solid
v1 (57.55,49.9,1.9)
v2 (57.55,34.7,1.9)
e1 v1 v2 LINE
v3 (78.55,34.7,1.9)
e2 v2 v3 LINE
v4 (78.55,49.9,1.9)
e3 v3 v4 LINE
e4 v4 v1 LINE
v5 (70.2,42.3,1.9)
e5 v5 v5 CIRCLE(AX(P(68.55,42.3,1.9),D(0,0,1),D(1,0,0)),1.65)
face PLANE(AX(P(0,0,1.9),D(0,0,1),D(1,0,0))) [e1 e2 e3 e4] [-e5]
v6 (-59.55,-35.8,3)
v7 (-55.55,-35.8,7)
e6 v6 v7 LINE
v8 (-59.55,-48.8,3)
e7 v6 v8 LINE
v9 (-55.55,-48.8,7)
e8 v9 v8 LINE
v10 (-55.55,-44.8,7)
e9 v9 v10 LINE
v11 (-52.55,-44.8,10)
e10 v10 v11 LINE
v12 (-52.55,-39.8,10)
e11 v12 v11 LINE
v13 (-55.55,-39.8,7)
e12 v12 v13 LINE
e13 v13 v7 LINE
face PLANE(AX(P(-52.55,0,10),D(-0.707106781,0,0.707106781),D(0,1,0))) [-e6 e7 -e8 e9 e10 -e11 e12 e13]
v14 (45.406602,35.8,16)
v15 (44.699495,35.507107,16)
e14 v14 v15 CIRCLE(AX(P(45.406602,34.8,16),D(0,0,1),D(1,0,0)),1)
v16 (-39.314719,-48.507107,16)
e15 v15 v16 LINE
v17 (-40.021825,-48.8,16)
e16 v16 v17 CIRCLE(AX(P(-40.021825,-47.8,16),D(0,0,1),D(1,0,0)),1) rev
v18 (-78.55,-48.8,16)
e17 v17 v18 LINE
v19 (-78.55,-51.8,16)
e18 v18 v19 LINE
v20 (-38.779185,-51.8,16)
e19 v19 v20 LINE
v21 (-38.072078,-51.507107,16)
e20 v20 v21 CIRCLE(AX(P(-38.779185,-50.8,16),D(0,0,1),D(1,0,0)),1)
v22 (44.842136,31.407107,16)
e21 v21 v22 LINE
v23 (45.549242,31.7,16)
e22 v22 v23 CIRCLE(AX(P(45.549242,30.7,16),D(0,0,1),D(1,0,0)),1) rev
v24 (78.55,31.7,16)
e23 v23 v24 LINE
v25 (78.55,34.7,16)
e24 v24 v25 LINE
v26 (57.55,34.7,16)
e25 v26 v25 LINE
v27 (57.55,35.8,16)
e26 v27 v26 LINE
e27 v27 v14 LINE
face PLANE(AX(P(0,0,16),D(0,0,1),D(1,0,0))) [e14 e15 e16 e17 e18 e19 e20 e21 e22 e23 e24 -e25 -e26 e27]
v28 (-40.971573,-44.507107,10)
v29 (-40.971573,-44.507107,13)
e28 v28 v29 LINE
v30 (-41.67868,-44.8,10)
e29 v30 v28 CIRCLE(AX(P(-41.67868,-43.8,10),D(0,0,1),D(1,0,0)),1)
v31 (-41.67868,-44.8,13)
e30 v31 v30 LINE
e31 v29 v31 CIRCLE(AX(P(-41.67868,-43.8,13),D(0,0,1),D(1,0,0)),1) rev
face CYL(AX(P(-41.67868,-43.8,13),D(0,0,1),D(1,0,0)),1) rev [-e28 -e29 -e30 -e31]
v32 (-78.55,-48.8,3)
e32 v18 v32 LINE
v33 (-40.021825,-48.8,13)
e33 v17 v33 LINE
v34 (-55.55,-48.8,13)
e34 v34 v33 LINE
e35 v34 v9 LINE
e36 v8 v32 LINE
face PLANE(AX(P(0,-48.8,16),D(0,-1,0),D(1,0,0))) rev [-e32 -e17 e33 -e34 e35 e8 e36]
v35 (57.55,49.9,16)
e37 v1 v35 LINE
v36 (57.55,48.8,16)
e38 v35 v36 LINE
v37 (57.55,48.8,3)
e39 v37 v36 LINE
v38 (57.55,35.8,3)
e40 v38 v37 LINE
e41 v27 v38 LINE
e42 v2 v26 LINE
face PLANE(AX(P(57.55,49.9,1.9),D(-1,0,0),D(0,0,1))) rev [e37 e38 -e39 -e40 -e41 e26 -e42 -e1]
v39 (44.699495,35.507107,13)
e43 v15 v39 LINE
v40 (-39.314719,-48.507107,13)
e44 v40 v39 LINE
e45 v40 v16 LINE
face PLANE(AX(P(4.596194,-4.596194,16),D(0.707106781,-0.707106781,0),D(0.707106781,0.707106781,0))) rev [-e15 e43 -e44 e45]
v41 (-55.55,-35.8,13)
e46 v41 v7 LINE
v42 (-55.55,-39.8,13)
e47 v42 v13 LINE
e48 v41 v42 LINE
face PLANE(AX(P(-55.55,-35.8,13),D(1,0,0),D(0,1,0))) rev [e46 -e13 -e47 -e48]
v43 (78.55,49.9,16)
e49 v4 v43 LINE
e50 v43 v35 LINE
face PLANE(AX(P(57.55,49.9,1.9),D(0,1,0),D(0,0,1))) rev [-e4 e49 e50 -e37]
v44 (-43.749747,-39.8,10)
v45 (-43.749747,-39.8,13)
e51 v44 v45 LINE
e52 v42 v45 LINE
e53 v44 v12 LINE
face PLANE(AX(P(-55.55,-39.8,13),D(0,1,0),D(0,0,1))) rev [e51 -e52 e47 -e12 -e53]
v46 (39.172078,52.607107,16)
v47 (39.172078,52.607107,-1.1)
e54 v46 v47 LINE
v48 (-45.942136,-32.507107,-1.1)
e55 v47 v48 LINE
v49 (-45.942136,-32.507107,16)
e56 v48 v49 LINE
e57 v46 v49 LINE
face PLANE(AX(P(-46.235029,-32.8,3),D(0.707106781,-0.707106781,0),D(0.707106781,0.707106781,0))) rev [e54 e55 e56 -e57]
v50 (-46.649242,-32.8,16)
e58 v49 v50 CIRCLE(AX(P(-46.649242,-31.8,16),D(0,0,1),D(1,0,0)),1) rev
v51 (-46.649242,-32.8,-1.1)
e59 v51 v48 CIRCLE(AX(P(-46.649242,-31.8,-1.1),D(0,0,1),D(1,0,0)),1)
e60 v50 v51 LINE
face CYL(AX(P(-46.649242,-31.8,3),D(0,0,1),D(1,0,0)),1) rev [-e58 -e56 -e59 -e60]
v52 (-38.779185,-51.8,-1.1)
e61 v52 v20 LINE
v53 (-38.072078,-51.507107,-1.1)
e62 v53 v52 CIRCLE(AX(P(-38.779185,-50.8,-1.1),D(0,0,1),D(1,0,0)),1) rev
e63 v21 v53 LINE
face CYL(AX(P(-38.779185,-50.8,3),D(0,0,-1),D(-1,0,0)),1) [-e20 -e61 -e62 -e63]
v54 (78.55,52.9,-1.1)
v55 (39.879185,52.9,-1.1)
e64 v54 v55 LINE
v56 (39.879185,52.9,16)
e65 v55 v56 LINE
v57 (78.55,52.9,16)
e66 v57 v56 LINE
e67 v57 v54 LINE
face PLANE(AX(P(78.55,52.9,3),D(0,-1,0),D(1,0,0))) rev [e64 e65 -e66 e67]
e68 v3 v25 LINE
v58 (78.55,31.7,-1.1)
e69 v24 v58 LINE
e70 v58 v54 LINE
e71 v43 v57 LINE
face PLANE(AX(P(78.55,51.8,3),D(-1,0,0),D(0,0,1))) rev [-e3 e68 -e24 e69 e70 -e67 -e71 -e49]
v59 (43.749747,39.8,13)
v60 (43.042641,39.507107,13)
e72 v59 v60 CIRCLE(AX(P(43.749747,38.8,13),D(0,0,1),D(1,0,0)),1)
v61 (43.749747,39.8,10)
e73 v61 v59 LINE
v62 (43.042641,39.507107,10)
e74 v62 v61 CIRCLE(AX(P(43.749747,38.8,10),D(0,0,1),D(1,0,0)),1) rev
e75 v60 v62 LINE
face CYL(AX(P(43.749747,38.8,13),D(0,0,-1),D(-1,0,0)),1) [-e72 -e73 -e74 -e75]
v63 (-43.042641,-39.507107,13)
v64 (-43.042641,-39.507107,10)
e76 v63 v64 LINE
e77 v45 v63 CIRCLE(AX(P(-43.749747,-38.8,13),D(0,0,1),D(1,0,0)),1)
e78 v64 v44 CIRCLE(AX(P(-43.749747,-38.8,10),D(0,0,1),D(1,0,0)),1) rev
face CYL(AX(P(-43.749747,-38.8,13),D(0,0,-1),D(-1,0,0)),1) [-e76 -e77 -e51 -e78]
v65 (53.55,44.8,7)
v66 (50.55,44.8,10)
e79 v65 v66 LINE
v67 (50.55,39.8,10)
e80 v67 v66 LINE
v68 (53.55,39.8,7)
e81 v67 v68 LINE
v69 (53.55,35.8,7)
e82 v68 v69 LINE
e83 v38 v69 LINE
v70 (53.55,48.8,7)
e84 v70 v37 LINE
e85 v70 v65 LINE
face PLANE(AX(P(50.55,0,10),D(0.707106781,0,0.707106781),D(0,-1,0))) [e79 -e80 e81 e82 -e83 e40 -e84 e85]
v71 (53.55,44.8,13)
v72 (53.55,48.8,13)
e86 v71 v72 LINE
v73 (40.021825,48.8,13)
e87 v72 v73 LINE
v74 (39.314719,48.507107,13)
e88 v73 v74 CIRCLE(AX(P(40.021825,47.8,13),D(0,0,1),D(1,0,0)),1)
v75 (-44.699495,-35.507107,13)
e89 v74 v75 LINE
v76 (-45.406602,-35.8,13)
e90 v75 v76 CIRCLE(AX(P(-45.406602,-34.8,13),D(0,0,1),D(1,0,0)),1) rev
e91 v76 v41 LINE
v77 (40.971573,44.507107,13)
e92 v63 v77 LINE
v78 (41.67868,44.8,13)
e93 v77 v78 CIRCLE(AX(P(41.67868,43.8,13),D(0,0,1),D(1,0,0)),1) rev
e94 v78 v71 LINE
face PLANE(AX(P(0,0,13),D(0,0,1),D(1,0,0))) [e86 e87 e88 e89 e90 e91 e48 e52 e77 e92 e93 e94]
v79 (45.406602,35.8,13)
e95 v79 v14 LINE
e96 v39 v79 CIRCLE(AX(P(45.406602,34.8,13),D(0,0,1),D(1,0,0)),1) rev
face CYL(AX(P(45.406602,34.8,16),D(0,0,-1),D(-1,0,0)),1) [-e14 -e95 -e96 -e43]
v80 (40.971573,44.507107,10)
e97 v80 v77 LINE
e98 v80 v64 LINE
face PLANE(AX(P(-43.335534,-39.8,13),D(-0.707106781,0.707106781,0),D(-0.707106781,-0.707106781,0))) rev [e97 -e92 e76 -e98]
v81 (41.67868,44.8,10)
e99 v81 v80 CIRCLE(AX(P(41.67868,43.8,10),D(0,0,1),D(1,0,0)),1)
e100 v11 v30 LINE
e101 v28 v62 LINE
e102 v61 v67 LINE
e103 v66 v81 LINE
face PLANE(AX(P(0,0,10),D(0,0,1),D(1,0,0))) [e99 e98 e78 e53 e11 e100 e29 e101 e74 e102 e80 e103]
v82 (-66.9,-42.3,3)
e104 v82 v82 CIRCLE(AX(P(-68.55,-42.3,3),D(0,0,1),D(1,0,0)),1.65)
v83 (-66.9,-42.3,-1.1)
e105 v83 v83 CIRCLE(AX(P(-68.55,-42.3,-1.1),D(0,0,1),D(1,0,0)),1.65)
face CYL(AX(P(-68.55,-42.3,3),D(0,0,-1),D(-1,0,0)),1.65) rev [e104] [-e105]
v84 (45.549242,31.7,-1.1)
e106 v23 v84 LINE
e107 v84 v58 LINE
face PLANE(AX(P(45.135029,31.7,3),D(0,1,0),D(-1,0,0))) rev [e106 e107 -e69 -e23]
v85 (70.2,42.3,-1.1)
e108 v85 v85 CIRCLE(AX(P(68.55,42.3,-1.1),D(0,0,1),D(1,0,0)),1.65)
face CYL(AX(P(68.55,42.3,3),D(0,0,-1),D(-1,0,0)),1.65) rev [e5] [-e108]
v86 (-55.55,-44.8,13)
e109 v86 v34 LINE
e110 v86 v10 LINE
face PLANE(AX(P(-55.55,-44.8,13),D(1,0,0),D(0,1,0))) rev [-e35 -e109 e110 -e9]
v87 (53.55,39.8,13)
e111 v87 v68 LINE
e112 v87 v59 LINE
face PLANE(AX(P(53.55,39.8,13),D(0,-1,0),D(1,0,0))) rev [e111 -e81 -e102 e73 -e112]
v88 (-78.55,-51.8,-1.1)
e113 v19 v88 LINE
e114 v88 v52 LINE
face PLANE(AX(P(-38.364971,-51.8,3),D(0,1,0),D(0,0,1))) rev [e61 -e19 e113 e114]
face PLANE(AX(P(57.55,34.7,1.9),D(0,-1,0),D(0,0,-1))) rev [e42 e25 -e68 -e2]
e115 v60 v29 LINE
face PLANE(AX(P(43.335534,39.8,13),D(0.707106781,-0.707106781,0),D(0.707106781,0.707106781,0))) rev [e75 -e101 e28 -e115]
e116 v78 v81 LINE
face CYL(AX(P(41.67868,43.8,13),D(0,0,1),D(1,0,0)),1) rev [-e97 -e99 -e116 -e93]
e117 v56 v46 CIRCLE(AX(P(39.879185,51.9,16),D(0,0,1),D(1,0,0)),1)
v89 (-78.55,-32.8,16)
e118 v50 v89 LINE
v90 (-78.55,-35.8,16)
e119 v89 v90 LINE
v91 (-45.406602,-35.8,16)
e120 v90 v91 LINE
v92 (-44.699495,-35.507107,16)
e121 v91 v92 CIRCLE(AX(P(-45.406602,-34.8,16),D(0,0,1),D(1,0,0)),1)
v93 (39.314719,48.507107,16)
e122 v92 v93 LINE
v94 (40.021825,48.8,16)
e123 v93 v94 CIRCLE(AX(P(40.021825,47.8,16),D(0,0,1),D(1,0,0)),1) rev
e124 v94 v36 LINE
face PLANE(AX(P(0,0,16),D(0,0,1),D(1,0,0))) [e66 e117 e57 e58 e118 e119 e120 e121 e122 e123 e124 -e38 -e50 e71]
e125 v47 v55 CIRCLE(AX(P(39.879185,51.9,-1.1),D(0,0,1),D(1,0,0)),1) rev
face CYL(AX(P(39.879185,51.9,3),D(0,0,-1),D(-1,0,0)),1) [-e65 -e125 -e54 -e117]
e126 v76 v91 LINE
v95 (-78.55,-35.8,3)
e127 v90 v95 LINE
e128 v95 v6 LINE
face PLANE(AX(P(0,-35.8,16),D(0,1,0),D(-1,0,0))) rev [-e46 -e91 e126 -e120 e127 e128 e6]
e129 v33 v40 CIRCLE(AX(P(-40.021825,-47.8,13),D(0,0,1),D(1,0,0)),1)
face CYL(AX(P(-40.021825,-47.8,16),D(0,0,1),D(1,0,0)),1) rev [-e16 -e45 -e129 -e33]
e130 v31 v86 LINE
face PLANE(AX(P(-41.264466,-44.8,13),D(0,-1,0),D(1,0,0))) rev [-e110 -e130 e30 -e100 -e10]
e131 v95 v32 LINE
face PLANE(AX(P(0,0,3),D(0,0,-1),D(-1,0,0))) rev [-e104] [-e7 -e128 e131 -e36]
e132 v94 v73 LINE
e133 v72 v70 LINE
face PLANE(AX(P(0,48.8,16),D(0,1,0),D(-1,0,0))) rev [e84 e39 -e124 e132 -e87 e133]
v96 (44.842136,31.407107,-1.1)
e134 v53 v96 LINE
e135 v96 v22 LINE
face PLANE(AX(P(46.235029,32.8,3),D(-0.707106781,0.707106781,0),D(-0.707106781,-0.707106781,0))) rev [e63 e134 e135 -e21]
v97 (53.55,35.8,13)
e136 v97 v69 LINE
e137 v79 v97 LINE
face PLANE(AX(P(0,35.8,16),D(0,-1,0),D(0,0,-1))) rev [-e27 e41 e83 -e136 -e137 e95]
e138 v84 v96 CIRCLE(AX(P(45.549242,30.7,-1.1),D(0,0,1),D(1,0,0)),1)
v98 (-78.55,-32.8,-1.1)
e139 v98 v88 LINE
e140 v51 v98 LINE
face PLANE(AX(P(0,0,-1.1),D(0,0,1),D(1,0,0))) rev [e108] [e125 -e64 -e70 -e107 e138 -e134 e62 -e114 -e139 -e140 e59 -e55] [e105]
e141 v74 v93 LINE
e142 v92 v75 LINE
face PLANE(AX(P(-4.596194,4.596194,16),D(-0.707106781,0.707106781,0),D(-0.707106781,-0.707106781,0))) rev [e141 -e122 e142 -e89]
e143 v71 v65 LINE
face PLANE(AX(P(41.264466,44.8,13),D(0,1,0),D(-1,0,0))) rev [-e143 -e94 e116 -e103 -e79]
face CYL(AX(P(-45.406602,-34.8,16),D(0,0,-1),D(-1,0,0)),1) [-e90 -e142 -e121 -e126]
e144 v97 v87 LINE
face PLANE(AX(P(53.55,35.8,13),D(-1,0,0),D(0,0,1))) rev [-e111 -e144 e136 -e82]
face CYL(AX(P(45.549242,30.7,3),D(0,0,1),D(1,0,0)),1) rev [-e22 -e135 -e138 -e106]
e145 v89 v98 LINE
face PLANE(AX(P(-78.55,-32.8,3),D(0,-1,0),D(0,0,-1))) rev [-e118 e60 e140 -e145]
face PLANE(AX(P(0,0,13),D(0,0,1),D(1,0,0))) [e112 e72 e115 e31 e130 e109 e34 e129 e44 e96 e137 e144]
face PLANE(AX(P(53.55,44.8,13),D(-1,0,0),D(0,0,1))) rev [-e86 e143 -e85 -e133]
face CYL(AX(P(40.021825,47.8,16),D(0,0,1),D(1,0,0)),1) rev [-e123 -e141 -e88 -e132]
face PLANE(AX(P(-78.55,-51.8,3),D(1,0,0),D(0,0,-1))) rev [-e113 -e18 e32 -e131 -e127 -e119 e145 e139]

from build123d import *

# Parameters (mm, degrees)
SKETCH_10_R         = 1.65
EXTRUDE_1_DEPTH     = 3
EXTRUDE_START       = 3
EXTRUDE_2_DEPTH     = 7
EXTRUDE_3_DEPTH     = 13
CHAMFER_1_SIZE      = 7
EXTRUDE_5_DEPTH     = 10
EXTRUDE_START_2     = -1.1
SKETCH_16_R         = 1.65
EXTRUDE_6_DEPTH     = 4.1
EXTRUDE_7_DEPTH     = 16
SKETCH_18_W         = 21
SKETCH_18_H         = 15.2
CUT_EXTRUDE_1_DEPTH = 14.1
FILLET_1_R          = 1


with BuildPart() as part:
    # 草图10 → 凸台-拉伸1 (new body)
    with BuildSketch(Plane.XY):
        Polygon((-78.55, -32.8), (-46.235028843, -32.8), (38.364971157, 51.8), (78.55, 51.8), (78.55, 32.8), (46.235028843, 32.8), (-38.364971157, -51.8), (-78.55, -51.8), align=None)
        with Locations((-68.55, -42.3)):
            Circle(SKETCH_10_R, mode=Mode.SUBTRACT)
        with Locations((68.55, 42.3)):
            Circle(SKETCH_10_R, mode=Mode.SUBTRACT)
    extrude(amount=EXTRUDE_1_DEPTH)

    # 草图11 → 凸台-拉伸2 (add)
    with BuildSketch(Plane.XY.offset(EXTRUDE_START)):
        Polygon((-59.55, -32.8), (-59.55, -51.8), (-38.364971157, -51.8), (46.235028843, 32.8), (57.55, 32.8), (57.55, 51.8), (38.364971157, 51.8), (-46.235028843, -32.8), align=None)
    extrude(amount=EXTRUDE_2_DEPTH)

    # 草图12 → 凸台-拉伸3 (add)
    with BuildSketch(Plane.XY.offset(EXTRUDE_START)):
        Polygon((-78.55, -32.8), (-46.235028843, -32.8), (38.364971157, 51.8), (78.55, 51.8), (78.55, 48.8), (39.607611845, 48.8), (-44.992388155, -35.8), (-78.55, -35.8), align=None)
        Polygon((-78.55, -48.8), (-78.55, -51.8), (-38.364971157, -51.8), (46.235028843, 32.8), (78.55, 32.8), (78.55, 35.8), (44.992388155, 35.8), (-39.607611845, -48.8), align=None)
    extrude(amount=EXTRUDE_3_DEPTH)

    # 倒角1
    chamfer_1_edges = [part.edges().sort_by_distance(p)[0] for p in [
        (57.55, 42.3, 10),
        (-59.55, -42.3, 10),
    ]]
    chamfer(chamfer_1_edges, length=CHAMFER_1_SIZE - 0.0001)  # a hair under: the kernel refuses the full size

    # 草图15 → 凸台-拉伸5 (add)
    with BuildSketch(Plane.XY.offset(3)):
        Polygon((-55.55, -35.8), (-55.55, -39.8), (-43.335533906, -39.8), (41.264466094, 44.8), (53.55, 44.8), (53.55, 48.8), (39.607611845, 48.8), (-44.992388155, -35.8), align=None)
        Polygon((-55.55, -44.8), (-55.55, -48.8), (-39.607611845, -48.8), (44.992388155, 35.8), (53.55, 35.8), (53.55, 39.8), (43.335533906, 39.8), (-41.264466094, -44.8), align=None)
    extrude(amount=EXTRUDE_5_DEPTH)

    # 草图16 → 凸台-拉伸6 (add)
    with BuildSketch(Plane.XY.offset(EXTRUDE_START_2)):
        Polygon((-78.55, -32.8), (-78.55, -51.8), (-38.364971157, -51.8), (45.135028843, 31.7), (78.55, 31.7), (78.55, 52.9), (39.464971157, 52.9), (-46.235028843, -32.8), align=None)
        with Locations((-68.55, -42.3)):
            Circle(SKETCH_16_R, mode=Mode.SUBTRACT)
        with Locations((68.55, 42.3)):
            Circle(SKETCH_16_R, mode=Mode.SUBTRACT)
    extrude(amount=EXTRUDE_6_DEPTH)

    # 草图17 → 凸台-拉伸7 (add)
    with BuildSketch(Plane.XY):
        Polygon((78.55, 52.9), (78.55, 48.8), (39.607611845, 48.8), (37.486291501, 50.921320344), (39.464971157, 52.9), align=None)
        Polygon((78.55, 31.7), (45.135028843, 31.7), (43.013708499, 33.821320344), (44.992388155, 35.8), (78.55, 35.8), align=None)
    extrude(amount=EXTRUDE_7_DEPTH)

    # 草图18 → 切除-拉伸1 (cut)
    with BuildSketch(Plane.XY.offset(16)):
        with Locations((68.05, 42.3)):
            Rectangle(SKETCH_18_W, SKETCH_18_H)
    extrude(amount=-CUT_EXTRUDE_1_DEPTH, mode=Mode.SUBTRACT)


with BuildPart() as cut_extrude_1_kept_piece:
    # of the separate pieces the step leaves, the one the design keeps (cut_extrude_1_pieces_kept)
    add(part.part.solids().sort_by_distance((-59.55, -48.8, 3.0001))[0])

    # 圆角1
    fillet_1_edges = [cut_extrude_1_kept_piece.edges().sort_by_distance(p)[0] for p in [
        (-46.235028843, -32.8, 7.45),
        (-38.364971157, -51.8, 7.45),
        (-43.335533906, -39.8, 11.5),
        (41.264466094, 44.8, 11.5),
        (-41.264466094, -44.8, 11.5),
        (43.335533906, 39.8, 11.5),
        (45.135028843, 31.7, 7.45),
        (39.464971157, 52.9, 7.45),
        (39.607611845, 48.8, 14.5),
        (-44.992388155, -35.8, 14.5),
        (-39.607611845, -48.8, 14.5),
        (44.992388155, 35.8, 14.5),
    ]]
    fillet(fillet_1_edges, radius=FILLET_1_R)


solid = cut_extrude_1_kept_piece.part
